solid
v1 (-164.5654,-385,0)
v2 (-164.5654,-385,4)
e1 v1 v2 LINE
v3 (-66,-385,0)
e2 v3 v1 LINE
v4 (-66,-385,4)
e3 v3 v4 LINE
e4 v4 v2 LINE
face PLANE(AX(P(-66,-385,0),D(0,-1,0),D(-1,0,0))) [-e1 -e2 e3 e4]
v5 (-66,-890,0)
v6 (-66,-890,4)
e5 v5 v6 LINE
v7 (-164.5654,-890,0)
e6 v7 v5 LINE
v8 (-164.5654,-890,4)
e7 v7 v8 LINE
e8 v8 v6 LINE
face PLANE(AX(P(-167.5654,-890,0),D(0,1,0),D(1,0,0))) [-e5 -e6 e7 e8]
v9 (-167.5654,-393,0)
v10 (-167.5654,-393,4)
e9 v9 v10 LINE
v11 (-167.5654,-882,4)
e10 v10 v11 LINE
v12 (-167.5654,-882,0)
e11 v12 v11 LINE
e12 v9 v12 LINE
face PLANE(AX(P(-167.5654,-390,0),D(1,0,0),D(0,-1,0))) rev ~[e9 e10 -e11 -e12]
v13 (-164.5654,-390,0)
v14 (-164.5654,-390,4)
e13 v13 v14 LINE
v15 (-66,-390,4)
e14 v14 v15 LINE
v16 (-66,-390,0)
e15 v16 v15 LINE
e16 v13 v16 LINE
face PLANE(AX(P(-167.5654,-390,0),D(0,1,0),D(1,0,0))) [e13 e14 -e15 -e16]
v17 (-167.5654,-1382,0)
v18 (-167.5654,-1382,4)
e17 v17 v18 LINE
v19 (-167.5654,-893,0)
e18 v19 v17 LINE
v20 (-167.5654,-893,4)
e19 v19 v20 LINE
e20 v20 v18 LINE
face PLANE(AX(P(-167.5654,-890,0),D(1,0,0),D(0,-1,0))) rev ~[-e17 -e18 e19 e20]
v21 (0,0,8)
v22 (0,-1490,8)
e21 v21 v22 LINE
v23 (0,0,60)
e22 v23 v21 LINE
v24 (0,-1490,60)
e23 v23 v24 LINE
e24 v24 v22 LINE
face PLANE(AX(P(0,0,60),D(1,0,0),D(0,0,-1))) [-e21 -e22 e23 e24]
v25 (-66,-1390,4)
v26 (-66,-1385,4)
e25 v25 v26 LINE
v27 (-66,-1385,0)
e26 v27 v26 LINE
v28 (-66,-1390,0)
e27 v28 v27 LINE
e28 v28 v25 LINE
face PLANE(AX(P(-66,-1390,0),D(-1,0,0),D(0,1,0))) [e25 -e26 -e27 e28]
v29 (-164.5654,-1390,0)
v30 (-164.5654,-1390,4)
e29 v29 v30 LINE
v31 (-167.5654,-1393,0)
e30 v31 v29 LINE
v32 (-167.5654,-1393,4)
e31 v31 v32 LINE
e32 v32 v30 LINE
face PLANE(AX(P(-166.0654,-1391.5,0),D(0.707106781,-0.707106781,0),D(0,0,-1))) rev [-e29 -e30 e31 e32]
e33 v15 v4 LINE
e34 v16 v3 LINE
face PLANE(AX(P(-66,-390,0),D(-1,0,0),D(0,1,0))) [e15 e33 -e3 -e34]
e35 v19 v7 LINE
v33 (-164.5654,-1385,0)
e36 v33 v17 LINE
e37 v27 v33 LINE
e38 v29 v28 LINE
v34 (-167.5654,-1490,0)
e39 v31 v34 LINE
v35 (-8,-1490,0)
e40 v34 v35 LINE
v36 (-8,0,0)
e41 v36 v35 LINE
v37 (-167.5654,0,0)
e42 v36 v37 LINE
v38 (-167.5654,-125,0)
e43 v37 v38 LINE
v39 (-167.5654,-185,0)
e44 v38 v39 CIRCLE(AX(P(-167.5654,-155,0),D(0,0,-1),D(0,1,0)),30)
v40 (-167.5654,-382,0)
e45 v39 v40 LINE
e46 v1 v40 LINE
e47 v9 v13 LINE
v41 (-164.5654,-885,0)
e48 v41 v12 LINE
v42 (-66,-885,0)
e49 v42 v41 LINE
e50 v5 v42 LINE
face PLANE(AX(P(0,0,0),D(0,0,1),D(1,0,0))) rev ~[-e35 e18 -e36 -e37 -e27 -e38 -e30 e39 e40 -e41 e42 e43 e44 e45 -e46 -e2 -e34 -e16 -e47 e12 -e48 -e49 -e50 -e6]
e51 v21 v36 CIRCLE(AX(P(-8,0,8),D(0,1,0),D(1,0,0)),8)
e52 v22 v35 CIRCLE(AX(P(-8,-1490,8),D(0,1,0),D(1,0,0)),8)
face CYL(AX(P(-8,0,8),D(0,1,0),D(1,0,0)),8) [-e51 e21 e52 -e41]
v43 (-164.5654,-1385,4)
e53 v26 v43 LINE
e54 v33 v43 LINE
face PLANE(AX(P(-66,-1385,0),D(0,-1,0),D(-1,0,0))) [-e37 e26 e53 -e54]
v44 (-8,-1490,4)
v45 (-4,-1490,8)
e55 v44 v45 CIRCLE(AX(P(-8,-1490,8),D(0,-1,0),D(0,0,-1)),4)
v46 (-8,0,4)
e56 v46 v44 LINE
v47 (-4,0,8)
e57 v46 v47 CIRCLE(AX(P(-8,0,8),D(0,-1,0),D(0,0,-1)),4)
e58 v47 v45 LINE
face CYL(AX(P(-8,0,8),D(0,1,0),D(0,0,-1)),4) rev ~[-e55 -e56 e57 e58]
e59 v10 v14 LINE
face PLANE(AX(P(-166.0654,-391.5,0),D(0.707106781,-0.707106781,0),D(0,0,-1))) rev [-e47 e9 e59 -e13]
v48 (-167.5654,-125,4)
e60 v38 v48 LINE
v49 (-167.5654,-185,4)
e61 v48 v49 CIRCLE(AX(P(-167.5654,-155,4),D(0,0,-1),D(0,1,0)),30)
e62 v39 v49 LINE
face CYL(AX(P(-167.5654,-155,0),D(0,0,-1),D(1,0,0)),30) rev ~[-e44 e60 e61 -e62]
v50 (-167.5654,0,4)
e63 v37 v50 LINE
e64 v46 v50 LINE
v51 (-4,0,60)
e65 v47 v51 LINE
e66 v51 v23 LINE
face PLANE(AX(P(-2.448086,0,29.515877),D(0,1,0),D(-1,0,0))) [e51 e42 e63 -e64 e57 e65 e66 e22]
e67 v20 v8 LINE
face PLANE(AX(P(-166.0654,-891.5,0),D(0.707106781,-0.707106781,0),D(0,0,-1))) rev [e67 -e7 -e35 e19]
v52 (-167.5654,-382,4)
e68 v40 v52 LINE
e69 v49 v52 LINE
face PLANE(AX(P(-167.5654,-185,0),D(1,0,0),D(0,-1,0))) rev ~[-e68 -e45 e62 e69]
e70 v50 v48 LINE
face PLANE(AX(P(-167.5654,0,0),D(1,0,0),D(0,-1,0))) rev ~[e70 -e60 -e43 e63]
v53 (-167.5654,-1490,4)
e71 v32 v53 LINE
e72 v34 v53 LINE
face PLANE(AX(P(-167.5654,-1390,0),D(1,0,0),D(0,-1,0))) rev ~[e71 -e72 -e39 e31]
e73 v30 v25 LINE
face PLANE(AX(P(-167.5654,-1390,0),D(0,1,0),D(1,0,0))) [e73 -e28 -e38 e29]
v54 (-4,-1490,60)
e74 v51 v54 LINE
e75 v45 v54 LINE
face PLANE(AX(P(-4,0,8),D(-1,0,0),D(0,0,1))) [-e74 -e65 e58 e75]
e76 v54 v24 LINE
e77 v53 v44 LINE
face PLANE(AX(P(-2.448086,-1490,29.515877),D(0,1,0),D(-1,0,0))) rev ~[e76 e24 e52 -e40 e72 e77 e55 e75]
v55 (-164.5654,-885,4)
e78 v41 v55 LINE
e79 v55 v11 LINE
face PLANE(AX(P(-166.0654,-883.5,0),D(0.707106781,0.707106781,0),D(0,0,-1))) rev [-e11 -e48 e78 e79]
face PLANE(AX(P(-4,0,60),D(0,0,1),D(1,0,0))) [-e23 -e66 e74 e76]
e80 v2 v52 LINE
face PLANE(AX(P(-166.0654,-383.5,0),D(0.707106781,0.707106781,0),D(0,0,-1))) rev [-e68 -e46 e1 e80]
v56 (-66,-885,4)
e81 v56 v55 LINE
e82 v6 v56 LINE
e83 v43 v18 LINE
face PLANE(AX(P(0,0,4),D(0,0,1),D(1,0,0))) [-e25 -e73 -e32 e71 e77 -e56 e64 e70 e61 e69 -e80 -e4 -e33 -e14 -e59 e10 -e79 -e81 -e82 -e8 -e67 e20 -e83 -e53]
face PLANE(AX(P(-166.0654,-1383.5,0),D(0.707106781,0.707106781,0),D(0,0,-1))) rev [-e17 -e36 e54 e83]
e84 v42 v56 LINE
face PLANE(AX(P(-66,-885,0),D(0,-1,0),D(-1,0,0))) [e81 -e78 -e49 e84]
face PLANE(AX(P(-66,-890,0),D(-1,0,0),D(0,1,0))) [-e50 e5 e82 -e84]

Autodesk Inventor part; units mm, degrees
ref_plane "YZ Plane" through (0, 0, 0) normal (1, 0, 0) x (0, 1, 0)
ref_plane "XZ Plane" through (0, 0, 0) normal (0, 1, 0) x (-1, 0, 0)
ref_plane "XY Plane" through (0, 0, 0) normal (0, 0, 1) x (1, 0, 0)
sketch "Sketch1" plane through (0, 0, 0) normal (0, 0, 1) x (1, 0, 0)
  line L0 (0, 0) -> (-167.5654, 0)
  line L1 (-167.5654, 0) -> (-167.5654, -1490)
  line L2 (-167.5654, -1490) -> (0, -1490)
  line L3 (0, -1490) -> (0, 0)
  line L4 (-167.5654, -1390) -> (-66, -1390)
  line L5 (-66, -1390) -> (-66, -1385)
  line L6 (-66, -1385) -> (-167.5654, -1385)
  line L7 (-167.5654, -1385) -> (-167.5654, -1390)
  line L8 (-167.5654, -890) -> (-66, -890)
  line L9 (-66, -890) -> (-66, -885)
  line L10 (-66, -885) -> (-167.5654, -885)
  line L11 (-167.5654, -885) -> (-167.5654, -890)
  line L12 (-167.5654, -390) -> (-66, -390)
  line L13 (-66, -390) -> (-66, -385)
  line L14 (-66, -385) -> (-167.5654, -385)
  line L15 (-167.5654, -385) -> (-167.5654, -390)
  circle A0 centre (-167.5654, -155) radius 30
  point P0 (-167.5654, -385)
  point P1 (-167.5654, -390)
  point P2 (-167.5654, -885)
  point P3 (-167.5654, -890)
  point P4 (-167.5654, -125)
  point P5 (-167.5654, -185)
  dimension "d0" = 1490
  dimension "d1" = 167.5654
  dimension "d2" = 5
  dimension "d4" = 100
  dimension "d7" = 500
  dimension "d23" = 66
  dimension "d28" = 60
  dimension "d29" = 1335
extrude "Plate1" add sketch "Sketch1" along normal blind 4 contours L3 L2 L1 L4 L5 L6 L8 L9 L10 L12 L13 L14 A0 L0
sketch "Sketch2" plane through (-4, 0, 0) normal (1, 0, 0) x (0, 1, 0)
  line L0 (-1490, 0) -> (0, 0)
  line L1 (0, 0) -> (0, 60)
  line L2 (0, 60) -> (-1490, 60)
  line L3 (-1490, 60) -> (-1490, 0)
edge flange "Flange1" height 60 angle 90 thickness 4 bend radius 4 thickness toward (1, 0, 0) relief tear relief width 4 relief depth 2 edges at (0, -745, 4) wall of the first edge with corners at (-4, -1490, 0) (-4, 0, 0) (-4, 0, 60) (-4, -1490, 60)
bend "Bend1"
corner "Corner1"
chamfer "Corner Chamfer1" distance 3 angle 45 6 edges at (-167.5654, -1390, 2) (-167.5654, -1385, 2) (-167.5654, -890, 2) (-167.5654, -885, 2) (-167.5654, -385, 2) (-167.5654, -390, 2)
equation "\"d0\" = Стрингер_длина"
equation "\"d1\" = стрингер_глубина_3"
equation "\"d2\" = паз_под_стрингер_толщина"
equation "\"d23\" = паз_под_стрингер_глубина - Thickness"
equation "\"d28\" = 2 * радиус_выреза_под_сварку"
equation "\"d12\" = Thickness"
equation "\"d13\" = BendReliefWidth"
equation "\"d14\" = BendReliefDepth"
equation "\"d15\" = MinimumRemnant"
equation "\"d16\" = TransitionRadius"
equation "\"d17\" = ребро_усилителей"
equation "\"d19\" = BendRadius"
equation "\"d20\" = CornerReliefSize"
equation "\"d21\" = GapSize"
equation "\"d22\" = JacobiRadiusSize"
equation "\"BendRadius\" = Thickness"
equation "\"BendReliefWidth\" = Thickness"
equation "\"BendReliefDepth\" = 0.5 * Thickness"
equation "\"CornerReliefSize\" = 4 * Thickness"
equation "\"MinimumRemnant\" = 2 * Thickness"
equation "\"TransitionRadius\" = BendRadius"
equation "\"JacobiRadiusSize\" = BendRadius"
equation "\"GapSize\" = Thickness"
equation "\"Стрингер_длина\" = 1490"
equation "\"стрингер_глубина_3\" = 167.565356"
equation "\"паз_под_стрингер_толщина\" = 5"
equation "\"паз_под_стрингер_глубина\" = 70"
equation "\"Thickness\" = 4"
equation "\"радиус_выреза_под_сварку\" = 30"
equation "\"ребро_усилителей\" = 60"
properties part number "0236 GBK stringer 3" material "Steel"
